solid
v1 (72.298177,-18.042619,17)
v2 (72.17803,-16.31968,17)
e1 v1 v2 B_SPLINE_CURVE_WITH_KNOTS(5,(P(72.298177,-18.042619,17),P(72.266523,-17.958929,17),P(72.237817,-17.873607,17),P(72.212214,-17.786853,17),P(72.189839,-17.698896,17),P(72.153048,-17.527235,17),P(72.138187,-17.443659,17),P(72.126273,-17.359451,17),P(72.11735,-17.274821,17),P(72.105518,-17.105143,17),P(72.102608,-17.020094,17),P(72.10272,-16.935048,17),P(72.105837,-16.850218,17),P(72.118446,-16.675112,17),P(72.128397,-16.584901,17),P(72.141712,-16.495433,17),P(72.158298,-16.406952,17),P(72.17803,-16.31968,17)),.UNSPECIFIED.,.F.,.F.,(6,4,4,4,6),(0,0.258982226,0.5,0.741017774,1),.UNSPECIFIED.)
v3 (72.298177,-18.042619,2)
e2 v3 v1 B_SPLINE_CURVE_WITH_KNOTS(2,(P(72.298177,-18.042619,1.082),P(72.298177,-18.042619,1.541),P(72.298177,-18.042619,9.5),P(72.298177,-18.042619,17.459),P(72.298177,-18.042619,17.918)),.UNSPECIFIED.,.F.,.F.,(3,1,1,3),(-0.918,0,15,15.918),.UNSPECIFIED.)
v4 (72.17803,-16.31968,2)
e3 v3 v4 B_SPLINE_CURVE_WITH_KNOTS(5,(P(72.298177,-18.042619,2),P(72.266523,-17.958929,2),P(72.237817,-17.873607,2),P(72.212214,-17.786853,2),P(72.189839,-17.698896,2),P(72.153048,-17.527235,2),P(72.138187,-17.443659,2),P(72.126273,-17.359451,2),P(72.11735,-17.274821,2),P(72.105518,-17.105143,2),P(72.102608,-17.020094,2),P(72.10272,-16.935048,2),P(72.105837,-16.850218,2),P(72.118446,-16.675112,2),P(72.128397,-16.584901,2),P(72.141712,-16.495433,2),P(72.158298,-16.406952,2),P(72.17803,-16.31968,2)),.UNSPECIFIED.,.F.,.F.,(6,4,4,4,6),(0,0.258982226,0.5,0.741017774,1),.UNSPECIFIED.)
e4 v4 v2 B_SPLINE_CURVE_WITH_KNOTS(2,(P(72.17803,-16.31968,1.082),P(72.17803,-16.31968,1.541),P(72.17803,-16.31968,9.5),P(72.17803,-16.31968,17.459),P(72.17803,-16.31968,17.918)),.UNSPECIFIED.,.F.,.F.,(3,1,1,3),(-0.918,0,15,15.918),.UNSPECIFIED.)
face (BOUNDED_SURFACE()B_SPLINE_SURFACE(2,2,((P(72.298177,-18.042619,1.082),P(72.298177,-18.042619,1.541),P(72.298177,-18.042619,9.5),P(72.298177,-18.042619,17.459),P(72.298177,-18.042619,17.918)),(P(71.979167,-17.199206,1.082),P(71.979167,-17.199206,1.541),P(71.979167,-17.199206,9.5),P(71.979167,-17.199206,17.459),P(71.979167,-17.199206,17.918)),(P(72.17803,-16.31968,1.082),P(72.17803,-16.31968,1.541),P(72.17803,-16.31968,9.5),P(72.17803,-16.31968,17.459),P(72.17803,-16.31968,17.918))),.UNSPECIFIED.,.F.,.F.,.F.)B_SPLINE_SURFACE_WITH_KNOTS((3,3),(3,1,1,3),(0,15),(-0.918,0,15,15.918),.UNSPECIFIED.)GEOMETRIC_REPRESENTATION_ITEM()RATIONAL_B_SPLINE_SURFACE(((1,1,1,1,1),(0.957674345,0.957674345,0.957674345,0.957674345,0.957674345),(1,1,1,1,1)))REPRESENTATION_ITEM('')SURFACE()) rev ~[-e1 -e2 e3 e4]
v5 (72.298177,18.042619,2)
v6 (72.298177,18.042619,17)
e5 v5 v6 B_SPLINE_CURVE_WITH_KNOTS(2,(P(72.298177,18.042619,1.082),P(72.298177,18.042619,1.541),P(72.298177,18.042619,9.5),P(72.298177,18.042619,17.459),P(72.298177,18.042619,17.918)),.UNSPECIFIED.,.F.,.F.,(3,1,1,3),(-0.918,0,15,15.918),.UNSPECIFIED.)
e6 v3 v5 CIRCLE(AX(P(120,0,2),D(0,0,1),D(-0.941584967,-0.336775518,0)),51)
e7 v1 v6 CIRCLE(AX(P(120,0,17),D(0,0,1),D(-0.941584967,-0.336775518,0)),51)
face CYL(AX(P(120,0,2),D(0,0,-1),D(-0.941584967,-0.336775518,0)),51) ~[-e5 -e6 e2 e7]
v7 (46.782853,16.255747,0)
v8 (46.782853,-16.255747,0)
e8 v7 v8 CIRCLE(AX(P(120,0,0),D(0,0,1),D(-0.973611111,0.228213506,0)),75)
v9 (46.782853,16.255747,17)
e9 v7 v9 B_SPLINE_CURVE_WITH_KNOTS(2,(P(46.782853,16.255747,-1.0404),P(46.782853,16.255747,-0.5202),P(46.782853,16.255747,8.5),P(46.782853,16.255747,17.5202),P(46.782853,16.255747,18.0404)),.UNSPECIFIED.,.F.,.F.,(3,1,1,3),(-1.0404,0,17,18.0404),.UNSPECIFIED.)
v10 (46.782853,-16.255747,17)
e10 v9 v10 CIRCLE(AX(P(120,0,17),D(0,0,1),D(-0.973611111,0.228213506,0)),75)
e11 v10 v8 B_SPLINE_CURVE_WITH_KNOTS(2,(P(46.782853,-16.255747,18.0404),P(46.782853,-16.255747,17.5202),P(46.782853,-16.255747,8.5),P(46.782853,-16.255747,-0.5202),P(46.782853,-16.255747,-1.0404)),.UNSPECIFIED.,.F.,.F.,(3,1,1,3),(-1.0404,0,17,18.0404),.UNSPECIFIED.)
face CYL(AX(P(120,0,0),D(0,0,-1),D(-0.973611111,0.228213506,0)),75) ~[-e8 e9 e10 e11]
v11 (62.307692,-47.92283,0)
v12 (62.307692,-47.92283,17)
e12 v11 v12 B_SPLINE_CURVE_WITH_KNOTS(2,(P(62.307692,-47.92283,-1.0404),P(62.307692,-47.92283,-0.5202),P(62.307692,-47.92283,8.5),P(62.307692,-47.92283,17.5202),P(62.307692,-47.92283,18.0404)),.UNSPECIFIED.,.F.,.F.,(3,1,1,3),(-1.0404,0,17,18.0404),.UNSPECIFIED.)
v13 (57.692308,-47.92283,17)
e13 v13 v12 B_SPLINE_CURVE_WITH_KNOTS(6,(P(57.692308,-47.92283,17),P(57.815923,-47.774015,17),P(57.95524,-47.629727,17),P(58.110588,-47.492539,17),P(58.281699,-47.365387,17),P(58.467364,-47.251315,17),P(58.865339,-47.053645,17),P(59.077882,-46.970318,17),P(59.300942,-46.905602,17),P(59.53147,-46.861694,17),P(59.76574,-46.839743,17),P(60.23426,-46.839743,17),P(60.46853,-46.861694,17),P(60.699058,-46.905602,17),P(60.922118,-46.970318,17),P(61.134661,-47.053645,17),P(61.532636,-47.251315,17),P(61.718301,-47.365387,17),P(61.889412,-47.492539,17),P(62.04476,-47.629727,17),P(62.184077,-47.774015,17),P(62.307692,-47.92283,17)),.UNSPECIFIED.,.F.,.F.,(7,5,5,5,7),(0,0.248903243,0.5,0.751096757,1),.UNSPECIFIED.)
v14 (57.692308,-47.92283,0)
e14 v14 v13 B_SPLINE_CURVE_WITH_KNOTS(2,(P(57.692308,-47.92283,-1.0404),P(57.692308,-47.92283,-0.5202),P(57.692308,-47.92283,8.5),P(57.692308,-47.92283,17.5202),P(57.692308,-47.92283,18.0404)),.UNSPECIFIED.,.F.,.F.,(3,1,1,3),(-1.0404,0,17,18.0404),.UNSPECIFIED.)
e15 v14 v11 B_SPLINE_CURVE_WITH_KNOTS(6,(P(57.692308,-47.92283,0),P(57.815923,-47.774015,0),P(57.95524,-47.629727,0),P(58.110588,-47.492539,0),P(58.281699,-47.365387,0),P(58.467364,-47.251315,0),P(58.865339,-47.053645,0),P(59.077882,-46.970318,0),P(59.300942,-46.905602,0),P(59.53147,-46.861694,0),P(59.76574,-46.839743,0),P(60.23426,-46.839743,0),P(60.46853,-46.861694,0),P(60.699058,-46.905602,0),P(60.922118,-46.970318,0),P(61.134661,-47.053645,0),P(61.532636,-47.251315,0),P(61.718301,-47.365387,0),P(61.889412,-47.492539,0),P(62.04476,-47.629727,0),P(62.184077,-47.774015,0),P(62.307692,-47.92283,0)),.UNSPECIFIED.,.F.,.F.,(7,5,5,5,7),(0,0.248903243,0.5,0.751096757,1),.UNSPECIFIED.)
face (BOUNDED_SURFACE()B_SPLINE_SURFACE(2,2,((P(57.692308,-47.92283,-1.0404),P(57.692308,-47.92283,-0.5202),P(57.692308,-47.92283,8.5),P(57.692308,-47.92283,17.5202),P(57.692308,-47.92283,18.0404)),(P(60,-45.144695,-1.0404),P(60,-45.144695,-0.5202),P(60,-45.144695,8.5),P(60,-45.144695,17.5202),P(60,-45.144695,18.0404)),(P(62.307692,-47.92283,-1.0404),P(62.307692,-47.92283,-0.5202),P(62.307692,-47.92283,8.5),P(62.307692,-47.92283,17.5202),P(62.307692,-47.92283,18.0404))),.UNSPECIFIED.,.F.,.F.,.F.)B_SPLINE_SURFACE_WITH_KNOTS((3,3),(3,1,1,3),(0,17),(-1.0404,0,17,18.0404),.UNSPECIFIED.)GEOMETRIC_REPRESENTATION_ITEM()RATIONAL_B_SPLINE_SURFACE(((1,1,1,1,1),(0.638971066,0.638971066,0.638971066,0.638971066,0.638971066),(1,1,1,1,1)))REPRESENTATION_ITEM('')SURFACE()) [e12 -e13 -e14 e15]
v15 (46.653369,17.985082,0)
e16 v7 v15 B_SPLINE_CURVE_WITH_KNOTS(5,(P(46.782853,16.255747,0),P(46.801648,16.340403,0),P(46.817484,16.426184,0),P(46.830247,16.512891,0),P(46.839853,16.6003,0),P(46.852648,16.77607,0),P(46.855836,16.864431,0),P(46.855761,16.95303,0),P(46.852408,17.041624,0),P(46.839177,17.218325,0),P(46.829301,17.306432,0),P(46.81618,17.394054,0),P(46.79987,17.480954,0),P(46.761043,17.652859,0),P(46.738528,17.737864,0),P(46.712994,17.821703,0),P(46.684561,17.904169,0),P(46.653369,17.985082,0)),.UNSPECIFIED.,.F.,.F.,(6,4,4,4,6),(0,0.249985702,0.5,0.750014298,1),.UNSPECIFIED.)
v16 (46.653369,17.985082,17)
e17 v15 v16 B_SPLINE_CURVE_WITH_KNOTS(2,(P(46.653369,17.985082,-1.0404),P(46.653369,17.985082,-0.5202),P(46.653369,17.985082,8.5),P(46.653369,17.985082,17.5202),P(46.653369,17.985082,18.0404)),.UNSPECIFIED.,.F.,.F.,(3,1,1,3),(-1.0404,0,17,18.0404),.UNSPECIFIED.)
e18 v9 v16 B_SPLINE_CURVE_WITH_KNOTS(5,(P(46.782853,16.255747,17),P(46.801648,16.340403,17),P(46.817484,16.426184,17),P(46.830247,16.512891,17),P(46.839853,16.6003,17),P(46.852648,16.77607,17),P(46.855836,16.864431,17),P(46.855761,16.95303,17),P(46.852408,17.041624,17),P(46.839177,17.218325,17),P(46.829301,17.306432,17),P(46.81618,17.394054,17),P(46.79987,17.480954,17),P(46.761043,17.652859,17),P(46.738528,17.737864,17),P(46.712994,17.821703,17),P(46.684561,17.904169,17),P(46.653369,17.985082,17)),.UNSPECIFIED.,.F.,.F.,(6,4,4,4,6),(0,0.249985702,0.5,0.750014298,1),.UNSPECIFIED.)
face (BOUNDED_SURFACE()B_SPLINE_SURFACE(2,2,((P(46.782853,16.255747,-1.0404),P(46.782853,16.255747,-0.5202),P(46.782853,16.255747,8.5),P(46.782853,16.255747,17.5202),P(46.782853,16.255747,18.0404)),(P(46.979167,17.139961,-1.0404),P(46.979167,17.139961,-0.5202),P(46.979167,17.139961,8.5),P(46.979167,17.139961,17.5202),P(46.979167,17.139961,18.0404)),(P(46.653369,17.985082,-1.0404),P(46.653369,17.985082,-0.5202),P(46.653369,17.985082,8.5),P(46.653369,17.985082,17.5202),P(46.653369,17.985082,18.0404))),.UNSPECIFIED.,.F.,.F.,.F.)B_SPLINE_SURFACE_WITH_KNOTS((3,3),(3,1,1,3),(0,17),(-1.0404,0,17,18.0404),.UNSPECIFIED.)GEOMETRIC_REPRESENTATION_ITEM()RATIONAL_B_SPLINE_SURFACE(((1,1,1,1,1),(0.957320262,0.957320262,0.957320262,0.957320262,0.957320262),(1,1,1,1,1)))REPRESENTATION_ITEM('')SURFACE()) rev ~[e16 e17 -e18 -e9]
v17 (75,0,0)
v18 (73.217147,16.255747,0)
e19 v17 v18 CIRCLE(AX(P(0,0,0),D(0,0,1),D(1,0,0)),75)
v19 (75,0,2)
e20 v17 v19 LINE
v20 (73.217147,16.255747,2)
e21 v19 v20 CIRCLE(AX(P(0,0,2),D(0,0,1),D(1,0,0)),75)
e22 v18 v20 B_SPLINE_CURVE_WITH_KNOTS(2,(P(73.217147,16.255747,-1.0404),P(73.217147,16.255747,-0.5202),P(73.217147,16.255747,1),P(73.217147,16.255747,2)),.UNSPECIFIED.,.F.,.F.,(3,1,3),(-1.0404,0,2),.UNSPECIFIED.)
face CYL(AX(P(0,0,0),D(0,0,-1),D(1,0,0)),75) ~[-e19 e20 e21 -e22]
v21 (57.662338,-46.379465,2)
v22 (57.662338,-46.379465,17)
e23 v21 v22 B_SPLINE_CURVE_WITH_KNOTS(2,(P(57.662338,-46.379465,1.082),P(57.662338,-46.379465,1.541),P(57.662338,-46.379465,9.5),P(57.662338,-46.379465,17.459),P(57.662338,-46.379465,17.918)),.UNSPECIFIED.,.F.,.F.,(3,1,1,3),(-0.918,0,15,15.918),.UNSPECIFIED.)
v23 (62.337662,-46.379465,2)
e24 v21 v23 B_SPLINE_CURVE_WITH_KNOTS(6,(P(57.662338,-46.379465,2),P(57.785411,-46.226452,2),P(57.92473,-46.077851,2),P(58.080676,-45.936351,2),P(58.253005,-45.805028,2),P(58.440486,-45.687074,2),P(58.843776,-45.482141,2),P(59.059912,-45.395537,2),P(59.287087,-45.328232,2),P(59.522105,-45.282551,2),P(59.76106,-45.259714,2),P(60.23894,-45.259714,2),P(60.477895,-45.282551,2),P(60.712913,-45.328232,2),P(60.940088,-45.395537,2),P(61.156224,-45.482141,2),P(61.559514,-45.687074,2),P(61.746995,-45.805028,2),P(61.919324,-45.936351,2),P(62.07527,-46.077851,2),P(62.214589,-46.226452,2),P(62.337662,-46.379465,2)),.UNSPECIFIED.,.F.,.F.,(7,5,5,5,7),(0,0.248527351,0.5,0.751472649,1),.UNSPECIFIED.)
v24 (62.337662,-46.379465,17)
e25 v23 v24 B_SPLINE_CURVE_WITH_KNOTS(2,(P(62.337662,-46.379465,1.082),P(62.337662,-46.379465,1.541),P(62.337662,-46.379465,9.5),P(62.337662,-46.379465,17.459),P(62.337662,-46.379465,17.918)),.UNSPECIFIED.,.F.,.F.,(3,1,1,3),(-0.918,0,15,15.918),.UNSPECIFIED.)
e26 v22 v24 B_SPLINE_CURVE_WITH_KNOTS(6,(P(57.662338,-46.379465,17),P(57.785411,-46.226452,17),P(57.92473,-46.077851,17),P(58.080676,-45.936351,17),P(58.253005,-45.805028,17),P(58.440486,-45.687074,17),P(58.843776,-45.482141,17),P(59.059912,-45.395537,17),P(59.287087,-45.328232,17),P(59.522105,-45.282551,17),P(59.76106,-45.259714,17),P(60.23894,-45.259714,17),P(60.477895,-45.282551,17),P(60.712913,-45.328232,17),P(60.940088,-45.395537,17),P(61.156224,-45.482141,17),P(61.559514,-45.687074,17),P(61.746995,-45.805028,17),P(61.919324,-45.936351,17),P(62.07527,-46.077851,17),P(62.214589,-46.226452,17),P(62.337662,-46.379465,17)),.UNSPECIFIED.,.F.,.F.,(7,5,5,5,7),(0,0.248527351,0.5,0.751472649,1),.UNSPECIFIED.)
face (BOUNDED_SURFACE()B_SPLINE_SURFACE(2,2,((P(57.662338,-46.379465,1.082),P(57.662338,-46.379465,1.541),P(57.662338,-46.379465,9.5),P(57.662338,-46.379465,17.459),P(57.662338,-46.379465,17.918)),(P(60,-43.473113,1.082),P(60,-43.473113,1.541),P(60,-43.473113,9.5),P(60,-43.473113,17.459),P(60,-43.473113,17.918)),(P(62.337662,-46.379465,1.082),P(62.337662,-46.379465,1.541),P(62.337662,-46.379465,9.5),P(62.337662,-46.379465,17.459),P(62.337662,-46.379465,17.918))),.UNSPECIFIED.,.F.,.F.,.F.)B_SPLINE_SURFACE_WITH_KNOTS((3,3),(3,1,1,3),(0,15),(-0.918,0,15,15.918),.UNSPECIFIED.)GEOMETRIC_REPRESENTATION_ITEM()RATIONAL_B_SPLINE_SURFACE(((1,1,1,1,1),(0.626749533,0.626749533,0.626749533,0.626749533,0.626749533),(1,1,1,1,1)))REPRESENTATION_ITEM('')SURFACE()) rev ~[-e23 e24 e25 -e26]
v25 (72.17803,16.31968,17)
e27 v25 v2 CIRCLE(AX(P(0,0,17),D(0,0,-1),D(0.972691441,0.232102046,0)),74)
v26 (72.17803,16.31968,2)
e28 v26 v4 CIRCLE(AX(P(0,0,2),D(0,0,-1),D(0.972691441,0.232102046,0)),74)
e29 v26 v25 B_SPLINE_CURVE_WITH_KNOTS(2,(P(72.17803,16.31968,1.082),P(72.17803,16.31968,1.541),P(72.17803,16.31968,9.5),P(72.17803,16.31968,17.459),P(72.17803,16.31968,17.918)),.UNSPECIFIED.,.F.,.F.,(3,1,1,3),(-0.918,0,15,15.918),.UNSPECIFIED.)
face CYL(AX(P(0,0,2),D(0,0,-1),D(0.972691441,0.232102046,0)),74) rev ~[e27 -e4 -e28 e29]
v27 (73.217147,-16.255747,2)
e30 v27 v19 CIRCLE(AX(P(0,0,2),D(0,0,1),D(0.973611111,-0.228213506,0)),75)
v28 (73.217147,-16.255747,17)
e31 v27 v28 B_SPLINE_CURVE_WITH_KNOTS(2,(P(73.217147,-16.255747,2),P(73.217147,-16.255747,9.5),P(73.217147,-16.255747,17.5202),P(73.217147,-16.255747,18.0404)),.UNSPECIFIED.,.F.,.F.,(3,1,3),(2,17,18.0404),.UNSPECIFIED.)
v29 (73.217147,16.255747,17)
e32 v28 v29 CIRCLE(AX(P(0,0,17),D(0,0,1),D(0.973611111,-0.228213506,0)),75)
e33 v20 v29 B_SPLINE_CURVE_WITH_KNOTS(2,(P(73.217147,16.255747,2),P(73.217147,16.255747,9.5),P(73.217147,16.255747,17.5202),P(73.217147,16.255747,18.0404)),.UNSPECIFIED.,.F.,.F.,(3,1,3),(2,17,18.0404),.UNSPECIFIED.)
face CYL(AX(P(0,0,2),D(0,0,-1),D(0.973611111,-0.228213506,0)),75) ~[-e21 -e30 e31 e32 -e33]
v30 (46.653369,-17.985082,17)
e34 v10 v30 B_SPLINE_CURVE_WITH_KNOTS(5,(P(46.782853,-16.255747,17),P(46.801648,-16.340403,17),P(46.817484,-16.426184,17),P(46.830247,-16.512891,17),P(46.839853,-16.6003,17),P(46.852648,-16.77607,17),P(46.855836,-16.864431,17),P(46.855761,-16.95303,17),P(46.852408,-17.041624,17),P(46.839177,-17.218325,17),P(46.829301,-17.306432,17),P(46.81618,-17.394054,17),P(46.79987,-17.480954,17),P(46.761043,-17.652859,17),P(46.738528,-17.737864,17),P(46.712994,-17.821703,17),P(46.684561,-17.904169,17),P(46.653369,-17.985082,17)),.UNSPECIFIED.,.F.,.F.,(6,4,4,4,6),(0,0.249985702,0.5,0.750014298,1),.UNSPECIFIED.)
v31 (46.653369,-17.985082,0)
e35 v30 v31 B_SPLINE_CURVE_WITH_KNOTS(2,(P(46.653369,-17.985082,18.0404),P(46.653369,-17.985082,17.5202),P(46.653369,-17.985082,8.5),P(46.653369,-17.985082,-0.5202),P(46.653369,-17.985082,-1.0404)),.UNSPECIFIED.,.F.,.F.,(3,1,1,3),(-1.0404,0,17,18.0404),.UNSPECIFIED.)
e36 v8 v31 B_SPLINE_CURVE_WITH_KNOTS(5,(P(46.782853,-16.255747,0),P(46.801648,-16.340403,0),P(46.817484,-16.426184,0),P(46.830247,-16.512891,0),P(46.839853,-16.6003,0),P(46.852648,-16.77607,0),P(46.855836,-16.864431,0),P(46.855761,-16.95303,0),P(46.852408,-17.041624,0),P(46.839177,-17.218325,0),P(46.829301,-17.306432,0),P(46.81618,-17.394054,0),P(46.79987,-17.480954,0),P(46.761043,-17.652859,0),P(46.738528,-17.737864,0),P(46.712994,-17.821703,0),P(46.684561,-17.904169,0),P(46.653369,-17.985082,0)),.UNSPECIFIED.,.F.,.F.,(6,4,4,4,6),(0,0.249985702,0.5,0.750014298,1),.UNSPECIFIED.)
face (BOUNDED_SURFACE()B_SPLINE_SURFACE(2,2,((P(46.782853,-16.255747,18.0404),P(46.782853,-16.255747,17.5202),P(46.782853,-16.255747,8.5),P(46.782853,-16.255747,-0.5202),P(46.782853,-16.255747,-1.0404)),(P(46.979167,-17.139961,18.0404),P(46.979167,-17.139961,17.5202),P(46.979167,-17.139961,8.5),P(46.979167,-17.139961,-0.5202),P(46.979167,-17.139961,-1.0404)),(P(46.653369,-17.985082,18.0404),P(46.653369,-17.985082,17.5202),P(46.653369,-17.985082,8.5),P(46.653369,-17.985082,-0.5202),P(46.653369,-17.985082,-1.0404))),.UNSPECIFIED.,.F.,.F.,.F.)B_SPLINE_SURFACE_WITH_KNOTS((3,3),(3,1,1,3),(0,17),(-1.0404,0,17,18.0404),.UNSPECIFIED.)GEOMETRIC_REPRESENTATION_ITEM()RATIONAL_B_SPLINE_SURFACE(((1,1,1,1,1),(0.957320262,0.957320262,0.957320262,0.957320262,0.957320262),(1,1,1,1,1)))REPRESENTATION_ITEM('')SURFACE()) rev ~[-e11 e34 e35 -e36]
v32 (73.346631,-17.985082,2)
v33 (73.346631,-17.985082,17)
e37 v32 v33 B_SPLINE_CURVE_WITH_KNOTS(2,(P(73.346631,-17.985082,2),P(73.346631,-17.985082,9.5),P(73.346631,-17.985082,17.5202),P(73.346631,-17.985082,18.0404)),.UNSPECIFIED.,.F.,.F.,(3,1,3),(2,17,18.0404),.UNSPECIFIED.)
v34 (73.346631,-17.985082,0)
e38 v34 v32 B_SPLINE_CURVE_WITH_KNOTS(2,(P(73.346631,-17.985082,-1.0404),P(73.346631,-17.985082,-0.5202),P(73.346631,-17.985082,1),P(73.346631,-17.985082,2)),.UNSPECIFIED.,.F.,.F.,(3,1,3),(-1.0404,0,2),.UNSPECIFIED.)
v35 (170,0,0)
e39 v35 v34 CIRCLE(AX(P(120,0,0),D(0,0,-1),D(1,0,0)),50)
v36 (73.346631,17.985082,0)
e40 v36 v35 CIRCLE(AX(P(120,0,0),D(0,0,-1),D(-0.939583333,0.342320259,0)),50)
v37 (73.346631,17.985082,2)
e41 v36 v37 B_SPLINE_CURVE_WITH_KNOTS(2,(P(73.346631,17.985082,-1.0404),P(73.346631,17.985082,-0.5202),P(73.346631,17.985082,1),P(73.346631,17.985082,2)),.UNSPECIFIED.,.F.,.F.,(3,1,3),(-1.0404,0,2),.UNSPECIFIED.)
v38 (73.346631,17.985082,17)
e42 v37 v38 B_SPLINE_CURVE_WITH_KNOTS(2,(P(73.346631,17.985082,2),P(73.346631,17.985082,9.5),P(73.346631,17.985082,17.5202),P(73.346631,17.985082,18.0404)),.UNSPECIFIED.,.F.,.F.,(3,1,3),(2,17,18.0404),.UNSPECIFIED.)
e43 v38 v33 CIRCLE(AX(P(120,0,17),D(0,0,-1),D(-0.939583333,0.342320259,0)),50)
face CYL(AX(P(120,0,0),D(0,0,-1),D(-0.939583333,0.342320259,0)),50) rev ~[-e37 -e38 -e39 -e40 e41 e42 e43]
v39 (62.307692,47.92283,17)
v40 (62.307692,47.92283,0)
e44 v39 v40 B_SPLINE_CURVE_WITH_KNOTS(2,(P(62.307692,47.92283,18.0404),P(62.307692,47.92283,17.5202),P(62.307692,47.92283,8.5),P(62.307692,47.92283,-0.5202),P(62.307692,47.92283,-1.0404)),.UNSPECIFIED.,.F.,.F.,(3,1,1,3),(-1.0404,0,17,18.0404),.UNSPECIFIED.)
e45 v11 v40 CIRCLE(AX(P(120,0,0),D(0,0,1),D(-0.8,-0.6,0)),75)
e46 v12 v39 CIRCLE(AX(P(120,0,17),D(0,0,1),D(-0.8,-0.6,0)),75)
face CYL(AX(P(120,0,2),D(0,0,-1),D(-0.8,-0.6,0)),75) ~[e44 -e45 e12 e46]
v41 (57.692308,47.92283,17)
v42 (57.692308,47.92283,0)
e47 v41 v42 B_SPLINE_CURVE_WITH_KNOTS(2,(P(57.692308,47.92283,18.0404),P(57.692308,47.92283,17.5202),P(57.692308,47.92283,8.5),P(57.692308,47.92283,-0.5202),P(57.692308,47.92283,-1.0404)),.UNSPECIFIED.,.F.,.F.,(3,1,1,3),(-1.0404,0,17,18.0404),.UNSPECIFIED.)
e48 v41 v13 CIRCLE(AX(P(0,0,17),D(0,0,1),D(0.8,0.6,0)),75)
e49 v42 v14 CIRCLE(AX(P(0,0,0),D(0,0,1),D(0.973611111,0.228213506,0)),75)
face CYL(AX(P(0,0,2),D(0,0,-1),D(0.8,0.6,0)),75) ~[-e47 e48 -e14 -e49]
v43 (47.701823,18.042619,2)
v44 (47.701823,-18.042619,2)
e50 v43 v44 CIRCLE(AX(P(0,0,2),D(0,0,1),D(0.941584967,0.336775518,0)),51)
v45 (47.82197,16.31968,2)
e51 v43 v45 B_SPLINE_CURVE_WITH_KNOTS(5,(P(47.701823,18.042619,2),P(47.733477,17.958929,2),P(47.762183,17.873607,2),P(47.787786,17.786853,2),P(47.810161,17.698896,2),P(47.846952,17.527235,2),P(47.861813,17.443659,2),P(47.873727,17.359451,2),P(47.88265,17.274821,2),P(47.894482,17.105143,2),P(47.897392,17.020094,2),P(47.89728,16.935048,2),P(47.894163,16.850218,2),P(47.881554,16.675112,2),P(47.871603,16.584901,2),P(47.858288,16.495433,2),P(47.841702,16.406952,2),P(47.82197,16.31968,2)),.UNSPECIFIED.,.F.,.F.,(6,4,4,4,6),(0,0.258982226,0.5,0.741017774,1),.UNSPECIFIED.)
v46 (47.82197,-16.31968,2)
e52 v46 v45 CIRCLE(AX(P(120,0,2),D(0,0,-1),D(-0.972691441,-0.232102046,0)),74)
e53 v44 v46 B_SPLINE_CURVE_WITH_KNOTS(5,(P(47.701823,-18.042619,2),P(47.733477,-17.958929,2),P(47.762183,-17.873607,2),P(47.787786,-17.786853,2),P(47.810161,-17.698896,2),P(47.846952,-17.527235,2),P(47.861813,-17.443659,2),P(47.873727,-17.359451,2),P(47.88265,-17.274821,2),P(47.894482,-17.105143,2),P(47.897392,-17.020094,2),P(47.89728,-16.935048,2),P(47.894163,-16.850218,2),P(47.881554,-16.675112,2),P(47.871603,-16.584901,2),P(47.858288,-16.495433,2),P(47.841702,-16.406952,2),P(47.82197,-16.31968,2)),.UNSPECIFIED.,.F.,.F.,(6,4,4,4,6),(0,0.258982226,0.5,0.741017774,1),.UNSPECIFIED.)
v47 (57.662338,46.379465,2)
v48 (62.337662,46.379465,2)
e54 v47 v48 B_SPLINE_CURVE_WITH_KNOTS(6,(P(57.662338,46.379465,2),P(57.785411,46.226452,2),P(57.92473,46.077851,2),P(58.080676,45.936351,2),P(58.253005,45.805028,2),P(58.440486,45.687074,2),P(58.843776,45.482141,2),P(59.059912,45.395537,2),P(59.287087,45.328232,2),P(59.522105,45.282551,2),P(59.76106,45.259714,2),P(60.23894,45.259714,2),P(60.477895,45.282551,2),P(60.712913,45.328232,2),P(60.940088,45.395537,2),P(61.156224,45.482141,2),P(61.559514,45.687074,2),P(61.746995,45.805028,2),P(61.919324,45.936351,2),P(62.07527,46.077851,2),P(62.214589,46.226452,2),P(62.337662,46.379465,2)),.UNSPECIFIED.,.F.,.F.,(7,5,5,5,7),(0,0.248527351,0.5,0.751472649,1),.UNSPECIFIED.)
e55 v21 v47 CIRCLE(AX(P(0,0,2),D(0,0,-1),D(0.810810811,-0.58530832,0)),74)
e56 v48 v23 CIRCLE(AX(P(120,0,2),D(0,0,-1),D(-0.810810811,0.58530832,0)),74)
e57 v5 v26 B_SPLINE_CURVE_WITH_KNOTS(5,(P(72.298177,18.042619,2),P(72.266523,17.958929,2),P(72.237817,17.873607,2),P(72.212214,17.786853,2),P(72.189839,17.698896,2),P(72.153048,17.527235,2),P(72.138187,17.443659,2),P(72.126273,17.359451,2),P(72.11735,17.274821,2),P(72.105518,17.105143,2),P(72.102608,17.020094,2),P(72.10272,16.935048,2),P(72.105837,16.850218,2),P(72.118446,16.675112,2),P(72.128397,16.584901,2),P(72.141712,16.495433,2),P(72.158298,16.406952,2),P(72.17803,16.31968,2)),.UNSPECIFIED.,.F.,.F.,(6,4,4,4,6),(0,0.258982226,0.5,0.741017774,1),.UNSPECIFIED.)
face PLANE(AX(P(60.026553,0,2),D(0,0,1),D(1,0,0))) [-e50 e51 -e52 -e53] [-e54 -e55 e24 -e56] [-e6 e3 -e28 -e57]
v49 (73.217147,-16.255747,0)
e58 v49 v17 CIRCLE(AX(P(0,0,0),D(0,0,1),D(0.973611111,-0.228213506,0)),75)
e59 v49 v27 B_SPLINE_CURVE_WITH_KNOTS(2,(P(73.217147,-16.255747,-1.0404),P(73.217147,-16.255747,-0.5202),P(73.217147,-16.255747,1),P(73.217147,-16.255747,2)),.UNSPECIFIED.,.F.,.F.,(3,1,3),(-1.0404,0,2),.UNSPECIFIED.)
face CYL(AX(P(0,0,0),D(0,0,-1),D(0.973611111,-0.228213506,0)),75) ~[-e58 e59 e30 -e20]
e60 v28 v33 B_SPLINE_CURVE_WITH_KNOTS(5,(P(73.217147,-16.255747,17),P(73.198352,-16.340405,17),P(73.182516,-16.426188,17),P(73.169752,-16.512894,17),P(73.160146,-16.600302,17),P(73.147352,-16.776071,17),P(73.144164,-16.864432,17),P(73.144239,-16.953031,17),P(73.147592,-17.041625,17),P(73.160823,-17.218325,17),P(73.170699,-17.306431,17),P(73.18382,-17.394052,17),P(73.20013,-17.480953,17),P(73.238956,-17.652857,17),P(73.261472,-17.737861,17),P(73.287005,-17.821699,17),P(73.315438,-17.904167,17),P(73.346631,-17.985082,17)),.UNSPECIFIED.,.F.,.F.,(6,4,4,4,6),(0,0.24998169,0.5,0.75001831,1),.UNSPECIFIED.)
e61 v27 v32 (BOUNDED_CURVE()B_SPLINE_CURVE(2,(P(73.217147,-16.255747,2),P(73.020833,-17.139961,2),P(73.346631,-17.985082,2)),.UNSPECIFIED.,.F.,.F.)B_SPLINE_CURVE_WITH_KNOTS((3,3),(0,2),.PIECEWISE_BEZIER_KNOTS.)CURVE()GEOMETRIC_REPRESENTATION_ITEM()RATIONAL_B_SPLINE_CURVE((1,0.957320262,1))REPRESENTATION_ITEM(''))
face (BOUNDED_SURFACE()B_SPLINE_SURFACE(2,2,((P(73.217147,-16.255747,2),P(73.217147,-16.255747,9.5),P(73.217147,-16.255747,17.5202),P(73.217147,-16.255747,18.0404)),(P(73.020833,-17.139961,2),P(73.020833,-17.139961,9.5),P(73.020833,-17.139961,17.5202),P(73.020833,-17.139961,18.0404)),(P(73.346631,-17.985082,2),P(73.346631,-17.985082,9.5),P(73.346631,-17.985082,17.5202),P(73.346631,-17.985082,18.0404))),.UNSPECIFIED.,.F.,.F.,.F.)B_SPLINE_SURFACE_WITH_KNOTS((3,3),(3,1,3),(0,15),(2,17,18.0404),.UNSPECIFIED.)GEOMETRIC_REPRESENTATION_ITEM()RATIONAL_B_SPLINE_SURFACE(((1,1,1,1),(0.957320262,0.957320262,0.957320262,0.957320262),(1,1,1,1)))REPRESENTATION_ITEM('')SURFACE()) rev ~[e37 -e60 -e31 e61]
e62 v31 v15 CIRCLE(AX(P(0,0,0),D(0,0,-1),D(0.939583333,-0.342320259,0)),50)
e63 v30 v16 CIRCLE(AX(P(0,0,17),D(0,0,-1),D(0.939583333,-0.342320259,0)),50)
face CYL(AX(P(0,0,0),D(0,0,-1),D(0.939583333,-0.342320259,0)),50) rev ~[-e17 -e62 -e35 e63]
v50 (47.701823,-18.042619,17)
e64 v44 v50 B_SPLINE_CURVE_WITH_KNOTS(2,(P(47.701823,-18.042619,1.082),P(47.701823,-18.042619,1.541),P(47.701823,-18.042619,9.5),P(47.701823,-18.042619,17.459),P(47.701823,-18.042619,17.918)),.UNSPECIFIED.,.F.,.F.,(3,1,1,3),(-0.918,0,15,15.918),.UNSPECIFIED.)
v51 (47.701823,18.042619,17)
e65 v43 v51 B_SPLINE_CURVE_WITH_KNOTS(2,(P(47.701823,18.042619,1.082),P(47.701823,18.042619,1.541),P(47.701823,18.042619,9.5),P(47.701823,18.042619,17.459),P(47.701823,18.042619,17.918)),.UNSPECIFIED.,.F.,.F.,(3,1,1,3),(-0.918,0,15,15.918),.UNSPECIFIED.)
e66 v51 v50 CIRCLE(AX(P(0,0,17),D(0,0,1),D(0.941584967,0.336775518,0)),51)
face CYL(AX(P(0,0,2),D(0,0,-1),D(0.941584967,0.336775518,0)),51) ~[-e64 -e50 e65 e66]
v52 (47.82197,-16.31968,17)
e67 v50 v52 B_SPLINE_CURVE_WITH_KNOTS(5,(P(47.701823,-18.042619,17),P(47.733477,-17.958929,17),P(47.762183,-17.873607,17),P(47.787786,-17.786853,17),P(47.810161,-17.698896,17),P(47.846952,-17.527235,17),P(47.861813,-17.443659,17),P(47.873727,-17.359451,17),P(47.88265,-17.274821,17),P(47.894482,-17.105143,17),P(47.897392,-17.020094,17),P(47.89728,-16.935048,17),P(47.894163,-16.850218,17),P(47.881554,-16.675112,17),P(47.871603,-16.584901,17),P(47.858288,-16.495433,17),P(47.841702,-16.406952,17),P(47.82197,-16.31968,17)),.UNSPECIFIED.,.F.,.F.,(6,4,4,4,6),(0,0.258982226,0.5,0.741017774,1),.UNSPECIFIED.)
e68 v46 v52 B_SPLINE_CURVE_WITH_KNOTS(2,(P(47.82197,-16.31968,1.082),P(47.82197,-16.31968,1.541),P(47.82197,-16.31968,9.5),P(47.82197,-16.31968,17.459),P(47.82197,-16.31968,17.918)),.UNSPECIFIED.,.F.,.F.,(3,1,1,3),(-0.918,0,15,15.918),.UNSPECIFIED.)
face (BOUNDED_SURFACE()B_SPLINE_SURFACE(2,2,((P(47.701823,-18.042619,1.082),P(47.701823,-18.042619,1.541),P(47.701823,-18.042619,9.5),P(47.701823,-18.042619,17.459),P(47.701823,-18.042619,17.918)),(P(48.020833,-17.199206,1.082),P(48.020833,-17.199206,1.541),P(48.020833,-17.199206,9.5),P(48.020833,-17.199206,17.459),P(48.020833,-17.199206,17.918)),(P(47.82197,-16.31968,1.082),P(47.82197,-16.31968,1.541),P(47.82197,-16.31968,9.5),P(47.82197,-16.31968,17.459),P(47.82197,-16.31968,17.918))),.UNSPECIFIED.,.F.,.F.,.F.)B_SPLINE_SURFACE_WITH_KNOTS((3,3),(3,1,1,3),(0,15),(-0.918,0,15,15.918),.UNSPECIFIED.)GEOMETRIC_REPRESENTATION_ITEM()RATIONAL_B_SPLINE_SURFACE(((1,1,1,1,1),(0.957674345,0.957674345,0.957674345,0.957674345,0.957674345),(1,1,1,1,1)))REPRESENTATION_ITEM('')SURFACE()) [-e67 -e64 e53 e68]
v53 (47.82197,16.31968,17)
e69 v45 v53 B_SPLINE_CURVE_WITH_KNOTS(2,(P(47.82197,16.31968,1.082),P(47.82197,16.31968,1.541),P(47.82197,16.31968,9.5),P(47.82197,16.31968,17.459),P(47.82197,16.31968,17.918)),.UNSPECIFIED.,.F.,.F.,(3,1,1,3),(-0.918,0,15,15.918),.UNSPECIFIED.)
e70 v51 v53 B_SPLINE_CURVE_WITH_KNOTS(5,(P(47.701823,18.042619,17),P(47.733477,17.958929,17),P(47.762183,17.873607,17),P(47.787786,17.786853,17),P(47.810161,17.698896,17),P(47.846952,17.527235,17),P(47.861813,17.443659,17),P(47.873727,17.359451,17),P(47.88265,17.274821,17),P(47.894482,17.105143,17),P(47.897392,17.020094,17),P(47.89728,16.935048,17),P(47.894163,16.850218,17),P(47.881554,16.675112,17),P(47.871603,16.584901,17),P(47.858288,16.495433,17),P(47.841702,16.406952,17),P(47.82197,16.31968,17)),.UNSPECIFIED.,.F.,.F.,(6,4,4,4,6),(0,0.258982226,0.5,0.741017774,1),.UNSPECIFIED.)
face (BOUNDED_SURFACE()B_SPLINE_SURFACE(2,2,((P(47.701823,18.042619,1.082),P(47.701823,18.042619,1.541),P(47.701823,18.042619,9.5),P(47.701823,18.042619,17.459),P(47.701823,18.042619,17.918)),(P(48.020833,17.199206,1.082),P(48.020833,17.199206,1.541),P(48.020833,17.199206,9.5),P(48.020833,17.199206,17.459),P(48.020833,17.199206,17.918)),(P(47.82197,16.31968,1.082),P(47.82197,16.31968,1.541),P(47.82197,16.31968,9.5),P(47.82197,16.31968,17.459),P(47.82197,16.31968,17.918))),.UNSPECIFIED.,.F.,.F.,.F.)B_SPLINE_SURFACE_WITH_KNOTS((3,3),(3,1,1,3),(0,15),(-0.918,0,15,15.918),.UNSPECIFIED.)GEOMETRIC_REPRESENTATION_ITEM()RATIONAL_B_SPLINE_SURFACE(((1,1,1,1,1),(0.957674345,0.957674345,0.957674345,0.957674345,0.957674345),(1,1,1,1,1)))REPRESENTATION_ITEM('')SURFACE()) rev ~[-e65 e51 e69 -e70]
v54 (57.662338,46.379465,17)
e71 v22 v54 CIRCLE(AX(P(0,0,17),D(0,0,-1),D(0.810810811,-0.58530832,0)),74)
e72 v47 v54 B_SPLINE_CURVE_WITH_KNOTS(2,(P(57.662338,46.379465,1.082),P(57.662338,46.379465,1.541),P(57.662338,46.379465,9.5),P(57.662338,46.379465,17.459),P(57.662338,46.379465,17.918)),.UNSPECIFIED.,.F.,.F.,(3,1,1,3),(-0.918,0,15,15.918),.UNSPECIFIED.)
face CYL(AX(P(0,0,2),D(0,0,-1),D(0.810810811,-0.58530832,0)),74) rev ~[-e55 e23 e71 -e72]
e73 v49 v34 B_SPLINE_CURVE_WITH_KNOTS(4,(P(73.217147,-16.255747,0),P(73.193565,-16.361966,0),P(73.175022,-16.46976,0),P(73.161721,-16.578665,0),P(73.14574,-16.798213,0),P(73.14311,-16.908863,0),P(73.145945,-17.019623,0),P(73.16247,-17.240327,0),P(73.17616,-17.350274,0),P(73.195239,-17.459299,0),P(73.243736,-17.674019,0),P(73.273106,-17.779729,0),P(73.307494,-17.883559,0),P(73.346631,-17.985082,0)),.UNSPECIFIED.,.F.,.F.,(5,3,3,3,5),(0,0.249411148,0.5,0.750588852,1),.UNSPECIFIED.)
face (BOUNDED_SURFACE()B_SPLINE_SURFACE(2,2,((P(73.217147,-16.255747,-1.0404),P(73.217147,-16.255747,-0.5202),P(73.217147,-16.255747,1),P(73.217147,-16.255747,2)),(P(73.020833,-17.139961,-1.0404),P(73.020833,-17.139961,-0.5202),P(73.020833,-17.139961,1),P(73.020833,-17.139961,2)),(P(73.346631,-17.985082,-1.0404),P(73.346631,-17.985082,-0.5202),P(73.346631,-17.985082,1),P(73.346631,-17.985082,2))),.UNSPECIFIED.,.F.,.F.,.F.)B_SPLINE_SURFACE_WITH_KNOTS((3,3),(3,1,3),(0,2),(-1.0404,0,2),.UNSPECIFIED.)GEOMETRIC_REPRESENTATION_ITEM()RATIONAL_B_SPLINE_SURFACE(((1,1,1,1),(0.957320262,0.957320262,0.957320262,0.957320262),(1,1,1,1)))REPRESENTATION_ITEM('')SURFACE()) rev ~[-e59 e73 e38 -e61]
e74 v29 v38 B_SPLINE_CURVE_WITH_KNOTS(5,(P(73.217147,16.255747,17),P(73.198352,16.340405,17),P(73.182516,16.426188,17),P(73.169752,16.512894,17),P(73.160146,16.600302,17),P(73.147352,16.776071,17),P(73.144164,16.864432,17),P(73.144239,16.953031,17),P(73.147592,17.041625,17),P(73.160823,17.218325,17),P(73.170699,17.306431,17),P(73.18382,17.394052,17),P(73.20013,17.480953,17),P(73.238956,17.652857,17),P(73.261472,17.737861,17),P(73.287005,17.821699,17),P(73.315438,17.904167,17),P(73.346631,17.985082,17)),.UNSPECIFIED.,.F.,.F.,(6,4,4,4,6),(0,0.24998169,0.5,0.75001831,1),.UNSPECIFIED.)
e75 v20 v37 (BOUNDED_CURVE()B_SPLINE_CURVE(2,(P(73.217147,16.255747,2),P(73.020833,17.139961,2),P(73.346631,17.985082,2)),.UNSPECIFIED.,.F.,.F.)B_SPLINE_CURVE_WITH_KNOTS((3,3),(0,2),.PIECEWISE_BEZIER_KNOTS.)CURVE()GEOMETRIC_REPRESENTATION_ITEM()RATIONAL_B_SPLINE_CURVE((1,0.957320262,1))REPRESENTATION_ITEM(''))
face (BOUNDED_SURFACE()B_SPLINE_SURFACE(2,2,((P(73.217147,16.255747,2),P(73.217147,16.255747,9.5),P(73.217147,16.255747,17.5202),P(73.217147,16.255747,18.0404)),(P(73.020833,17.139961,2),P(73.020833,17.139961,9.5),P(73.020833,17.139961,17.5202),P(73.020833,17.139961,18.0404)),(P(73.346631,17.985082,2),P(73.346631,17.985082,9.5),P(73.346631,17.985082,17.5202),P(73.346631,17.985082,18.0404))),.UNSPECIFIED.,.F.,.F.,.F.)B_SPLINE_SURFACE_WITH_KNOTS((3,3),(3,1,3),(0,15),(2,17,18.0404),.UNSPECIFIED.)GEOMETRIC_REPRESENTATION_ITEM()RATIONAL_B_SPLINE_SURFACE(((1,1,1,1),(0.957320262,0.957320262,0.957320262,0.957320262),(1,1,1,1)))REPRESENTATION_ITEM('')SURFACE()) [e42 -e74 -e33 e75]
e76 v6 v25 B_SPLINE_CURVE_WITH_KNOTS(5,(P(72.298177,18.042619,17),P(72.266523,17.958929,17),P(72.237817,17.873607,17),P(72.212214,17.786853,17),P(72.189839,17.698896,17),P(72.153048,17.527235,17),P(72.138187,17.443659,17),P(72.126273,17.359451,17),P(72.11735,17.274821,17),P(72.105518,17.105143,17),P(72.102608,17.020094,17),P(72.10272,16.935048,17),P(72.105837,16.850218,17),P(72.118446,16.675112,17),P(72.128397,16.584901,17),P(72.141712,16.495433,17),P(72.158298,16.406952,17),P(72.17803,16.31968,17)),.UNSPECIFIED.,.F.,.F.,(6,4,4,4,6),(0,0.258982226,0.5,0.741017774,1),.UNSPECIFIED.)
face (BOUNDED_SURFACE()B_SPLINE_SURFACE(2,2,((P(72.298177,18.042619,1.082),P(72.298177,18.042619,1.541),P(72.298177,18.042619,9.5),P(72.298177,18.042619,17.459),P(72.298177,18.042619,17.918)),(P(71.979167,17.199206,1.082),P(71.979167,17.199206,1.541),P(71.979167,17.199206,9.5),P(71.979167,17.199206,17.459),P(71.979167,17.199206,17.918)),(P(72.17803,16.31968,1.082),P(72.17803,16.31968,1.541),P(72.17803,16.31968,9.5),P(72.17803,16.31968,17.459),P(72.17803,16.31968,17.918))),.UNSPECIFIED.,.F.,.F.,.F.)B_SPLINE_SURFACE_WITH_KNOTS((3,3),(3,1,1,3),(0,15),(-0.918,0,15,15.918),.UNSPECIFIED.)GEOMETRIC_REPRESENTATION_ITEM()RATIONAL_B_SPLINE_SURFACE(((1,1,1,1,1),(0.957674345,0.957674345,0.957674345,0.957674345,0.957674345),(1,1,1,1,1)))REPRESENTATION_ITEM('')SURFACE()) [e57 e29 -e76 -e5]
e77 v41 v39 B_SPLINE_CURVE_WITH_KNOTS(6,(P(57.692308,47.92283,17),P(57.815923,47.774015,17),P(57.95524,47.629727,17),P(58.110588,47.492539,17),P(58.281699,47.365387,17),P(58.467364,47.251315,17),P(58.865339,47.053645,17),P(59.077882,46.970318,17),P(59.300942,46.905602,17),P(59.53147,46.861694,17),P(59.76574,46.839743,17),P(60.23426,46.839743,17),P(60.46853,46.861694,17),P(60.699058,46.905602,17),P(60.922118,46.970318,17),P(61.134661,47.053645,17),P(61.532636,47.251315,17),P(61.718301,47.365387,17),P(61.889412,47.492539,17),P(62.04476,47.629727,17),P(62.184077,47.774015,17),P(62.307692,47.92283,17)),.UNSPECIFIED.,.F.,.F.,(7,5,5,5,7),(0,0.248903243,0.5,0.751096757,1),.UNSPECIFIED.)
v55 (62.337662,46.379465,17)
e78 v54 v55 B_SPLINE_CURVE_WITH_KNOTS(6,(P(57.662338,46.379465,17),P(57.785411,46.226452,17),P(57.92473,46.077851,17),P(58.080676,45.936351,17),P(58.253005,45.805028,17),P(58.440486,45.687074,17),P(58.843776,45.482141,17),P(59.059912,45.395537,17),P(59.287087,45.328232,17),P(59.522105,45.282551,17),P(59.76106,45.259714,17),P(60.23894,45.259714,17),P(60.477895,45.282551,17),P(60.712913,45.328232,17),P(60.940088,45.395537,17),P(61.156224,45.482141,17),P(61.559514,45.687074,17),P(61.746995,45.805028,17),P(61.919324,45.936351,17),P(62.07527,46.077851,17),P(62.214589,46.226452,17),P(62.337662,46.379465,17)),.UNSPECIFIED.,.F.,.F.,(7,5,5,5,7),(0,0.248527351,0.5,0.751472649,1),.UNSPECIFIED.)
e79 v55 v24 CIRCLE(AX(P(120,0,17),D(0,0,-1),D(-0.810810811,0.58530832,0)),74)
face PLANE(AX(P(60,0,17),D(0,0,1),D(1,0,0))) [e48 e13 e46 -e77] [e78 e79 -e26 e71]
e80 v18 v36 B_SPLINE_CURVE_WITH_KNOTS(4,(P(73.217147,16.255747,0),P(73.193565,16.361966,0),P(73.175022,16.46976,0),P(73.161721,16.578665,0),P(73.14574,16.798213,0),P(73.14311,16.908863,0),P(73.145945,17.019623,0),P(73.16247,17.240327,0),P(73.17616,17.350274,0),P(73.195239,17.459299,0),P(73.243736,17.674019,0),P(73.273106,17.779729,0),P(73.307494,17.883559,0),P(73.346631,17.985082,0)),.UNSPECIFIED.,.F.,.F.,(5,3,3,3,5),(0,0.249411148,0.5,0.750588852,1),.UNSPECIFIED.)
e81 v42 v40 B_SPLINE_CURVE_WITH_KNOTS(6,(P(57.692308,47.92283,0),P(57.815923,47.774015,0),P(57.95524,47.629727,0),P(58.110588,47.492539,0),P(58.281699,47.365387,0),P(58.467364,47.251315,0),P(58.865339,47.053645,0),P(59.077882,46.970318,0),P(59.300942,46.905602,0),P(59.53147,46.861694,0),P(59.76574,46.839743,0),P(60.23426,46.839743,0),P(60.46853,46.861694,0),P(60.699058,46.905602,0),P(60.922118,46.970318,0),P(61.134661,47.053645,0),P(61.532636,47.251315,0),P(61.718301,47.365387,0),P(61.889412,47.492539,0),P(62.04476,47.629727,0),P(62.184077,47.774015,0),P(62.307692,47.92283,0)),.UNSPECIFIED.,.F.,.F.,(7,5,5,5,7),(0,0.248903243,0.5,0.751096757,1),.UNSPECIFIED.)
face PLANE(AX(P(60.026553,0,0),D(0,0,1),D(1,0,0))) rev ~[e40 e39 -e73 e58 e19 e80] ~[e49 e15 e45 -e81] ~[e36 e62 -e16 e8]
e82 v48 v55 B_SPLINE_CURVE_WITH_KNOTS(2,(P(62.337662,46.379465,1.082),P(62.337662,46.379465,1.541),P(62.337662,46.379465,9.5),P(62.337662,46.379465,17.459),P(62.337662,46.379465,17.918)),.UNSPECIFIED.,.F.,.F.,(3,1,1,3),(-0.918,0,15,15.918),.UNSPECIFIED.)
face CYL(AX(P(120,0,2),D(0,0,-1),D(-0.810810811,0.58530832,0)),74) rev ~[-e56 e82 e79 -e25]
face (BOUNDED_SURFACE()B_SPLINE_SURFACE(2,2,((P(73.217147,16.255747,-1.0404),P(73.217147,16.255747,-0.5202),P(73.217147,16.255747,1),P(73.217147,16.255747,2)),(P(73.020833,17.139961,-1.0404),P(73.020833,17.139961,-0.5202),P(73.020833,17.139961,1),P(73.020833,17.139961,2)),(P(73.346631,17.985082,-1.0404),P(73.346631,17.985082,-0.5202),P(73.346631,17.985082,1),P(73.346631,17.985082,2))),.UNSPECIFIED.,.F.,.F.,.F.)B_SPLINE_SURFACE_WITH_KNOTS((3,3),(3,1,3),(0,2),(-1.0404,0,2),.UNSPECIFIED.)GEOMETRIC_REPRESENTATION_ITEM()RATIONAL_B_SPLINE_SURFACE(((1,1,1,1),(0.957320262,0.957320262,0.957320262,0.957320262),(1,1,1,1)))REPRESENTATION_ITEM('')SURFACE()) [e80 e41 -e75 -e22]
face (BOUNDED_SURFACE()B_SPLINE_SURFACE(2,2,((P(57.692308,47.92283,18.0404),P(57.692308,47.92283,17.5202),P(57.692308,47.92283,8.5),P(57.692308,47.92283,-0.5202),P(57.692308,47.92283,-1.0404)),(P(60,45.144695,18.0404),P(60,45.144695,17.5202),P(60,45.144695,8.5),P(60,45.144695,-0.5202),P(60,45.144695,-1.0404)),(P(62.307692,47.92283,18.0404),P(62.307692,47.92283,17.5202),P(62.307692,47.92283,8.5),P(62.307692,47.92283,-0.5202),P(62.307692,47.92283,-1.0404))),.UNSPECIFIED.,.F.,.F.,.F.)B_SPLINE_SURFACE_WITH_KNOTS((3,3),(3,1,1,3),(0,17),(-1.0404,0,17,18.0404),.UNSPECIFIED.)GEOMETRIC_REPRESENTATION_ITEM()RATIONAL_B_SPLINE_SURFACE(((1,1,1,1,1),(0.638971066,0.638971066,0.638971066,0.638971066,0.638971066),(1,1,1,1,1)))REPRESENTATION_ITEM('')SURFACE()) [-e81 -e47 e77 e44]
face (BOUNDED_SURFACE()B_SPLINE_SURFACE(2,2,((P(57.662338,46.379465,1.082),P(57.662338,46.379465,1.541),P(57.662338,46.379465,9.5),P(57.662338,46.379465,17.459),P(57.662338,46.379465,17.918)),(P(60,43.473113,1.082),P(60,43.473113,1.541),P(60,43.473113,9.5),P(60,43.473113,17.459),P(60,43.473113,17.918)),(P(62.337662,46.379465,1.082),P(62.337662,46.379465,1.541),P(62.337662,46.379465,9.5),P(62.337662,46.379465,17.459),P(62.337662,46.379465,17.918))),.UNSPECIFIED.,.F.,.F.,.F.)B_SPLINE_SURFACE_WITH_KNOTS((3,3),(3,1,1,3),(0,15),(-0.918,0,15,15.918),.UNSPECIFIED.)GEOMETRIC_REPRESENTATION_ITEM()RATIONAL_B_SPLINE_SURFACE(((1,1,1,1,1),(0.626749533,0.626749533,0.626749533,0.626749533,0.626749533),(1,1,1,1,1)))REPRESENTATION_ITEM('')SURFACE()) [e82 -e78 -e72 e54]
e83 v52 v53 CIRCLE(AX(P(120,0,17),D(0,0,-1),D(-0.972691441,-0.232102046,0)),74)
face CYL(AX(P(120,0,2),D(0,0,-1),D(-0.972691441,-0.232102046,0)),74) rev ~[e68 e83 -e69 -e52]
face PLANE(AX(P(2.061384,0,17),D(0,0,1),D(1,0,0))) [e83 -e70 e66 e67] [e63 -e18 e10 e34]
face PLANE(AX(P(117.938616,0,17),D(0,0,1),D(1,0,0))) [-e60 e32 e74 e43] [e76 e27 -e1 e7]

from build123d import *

# Parameters (mm, degrees)
F1_DEPTH = 2
F3_DEPTH = 15
F4_R     = 3


with BuildPart() as f1:
    # F0 (on Top) → F1 (new body)
    with BuildSketch(Plane.XY):
        with BuildLine():
            ThreePointArc((46.9791666667, 17.11601295), (49.2390004637, 8.6902723394), (50, 0))
            ThreePointArc((50, 0), (49.2390004637, -8.6902723394), (46.9791666667, -17.11601295))
            ThreePointArc((46.9791666667, -17.11601295), (52.0440237461, -31.7330315504), (60, -45))
            ThreePointArc((60, -45), (67.9559762539, -31.7330315504), (73.0208333333, -17.11601295))
            ThreePointArc((73.0208333333, -17.11601295), (70, 0), (73.0208333333, 17.11601295))
            ThreePointArc((73.0208333333, 17.11601295), (67.9559762539, 31.7330315504), (60, 45))
            ThreePointArc((60, 45), (52.0440237461, 31.7330315504), (46.9791666667, 17.11601295))
        make_face()
        with BuildLine():
            ThreePointArc((46.9791666667, -17.11601295), (-50, 0), (46.9791666667, 17.11601295))
            ThreePointArc((46.9791666667, 17.11601295), (52.0440237461, 31.7330315504), (60, 45))
            ThreePointArc((60, 45), (-75, 0), (60, -45))
            ThreePointArc((60, -45), (52.0440237461, -31.7330315504), (46.9791666667, -17.11601295))
        make_face()
        with BuildLine():
            ThreePointArc((195, 0), (143.7170824513, 71.1512473538), (60, 45))
            ThreePointArc((60, 45), (67.9559762539, 31.7330315504), (73.0208333333, 17.11601295))
            ThreePointArc((73.0208333333, 17.11601295), (128.6902723394, 49.2390004637), (170, 0))
            ThreePointArc((170, 0), (128.6902723394, -49.2390004637), (73.0208333333, -17.11601295))
            ThreePointArc((73.0208333333, -17.11601295), (67.9559762539, -31.7330315504), (60, -45))
            ThreePointArc((60, -45), (143.7170824513, -71.1512473538), (195, 0))
        make_face()
        with BuildLine():
            ThreePointArc((46.9791666667, -17.11601295), (49.2390004637, -8.6902723394), (50, 0))
            ThreePointArc((50, 0), (49.2390004637, 8.6902723394), (46.9791666667, 17.11601295))
            ThreePointArc((46.9791666667, 17.11601295), (45, 0), (46.9791666667, -17.11601295))
        make_face()
        with BuildLine():
            ThreePointArc((75, 0), (74.5035653509, 8.6150304701), (73.0208333333, 17.11601295))
            ThreePointArc((73.0208333333, 17.11601295), (70, 0), (73.0208333333, -17.11601295))
            ThreePointArc((73.0208333333, -17.11601295), (74.5035653509, -8.6150304701), (75, 0))
        make_face()
    extrude(amount=F1_DEPTH)

    # F2 (on face) → F3 (join)
    with BuildSketch(Plane.XY.offset(2)):
        with BuildLine():
            ThreePointArc((60, 45), (-75, 0), (60, -45))
            ThreePointArc((60, -45), (195, 0), (60, 45))
        make_face()
        with BuildLine():
            ThreePointArc((60, -43.3128156554), (-74, 0), (60, 43.3128156554))
            ThreePointArc((60, 43.3128156554), (194, 0), (60, -43.3128156554))
        make_face(mode=Mode.SUBTRACT)
        with BuildLine():
            ThreePointArc((48.0208333333, -17.1755514023), (46, 0), (48.0208333333, 17.1755514023))
            ThreePointArc((48.0208333333, 17.1755514023), (-51, 0), (48.0208333333, -17.1755514023))
        make_face()
        with BuildLine():
            ThreePointArc((46.9791666667, -17.11601295), (-50, 0), (46.9791666667, 17.11601295))
            ThreePointArc((46.9791666667, 17.11601295), (45, 0), (46.9791666667, -17.11601295))
        make_face(mode=Mode.SUBTRACT)
        with BuildLine():
            ThreePointArc((71.9791666667, 17.1755514023), (74, 0), (71.9791666667, -17.1755514023))
            ThreePointArc((71.9791666667, -17.1755514023), (171, 0), (71.9791666667, 17.1755514023))
        make_face()
        with BuildLine():
            ThreePointArc((73.0208333333, 17.11601295), (170, 0), (73.0208333333, -17.11601295))
            ThreePointArc((73.0208333333, -17.11601295), (75, 0), (73.0208333333, 17.11601295))
        make_face(mode=Mode.SUBTRACT)
    extrude(amount=F3_DEPTH)

    # F4
    f4_edges = [f1.edges().sort_by_distance(p)[0] for p in [
        (60, 45, 8.5),
        (60, -45, 8.5),
        (60, 43.312816, 9.5),
        (71.979167, -17.175551, 9.5),
        (73.020833, -17.116013, 8.5),
        (73.020833, 17.116013, 8.5),
        (48.020833, 17.175551, 9.5),
        (46.979167, 17.116013, 8.5),
        (46.979167, -17.116013, 8.5),
        (60, -43.312816, 9.5),
        (48.020833, -17.175551, 9.5),
        (71.979167, 17.175551, 9.5),
    ]]
    fillet(f4_edges, radius=F4_R)


solid = f1.part
